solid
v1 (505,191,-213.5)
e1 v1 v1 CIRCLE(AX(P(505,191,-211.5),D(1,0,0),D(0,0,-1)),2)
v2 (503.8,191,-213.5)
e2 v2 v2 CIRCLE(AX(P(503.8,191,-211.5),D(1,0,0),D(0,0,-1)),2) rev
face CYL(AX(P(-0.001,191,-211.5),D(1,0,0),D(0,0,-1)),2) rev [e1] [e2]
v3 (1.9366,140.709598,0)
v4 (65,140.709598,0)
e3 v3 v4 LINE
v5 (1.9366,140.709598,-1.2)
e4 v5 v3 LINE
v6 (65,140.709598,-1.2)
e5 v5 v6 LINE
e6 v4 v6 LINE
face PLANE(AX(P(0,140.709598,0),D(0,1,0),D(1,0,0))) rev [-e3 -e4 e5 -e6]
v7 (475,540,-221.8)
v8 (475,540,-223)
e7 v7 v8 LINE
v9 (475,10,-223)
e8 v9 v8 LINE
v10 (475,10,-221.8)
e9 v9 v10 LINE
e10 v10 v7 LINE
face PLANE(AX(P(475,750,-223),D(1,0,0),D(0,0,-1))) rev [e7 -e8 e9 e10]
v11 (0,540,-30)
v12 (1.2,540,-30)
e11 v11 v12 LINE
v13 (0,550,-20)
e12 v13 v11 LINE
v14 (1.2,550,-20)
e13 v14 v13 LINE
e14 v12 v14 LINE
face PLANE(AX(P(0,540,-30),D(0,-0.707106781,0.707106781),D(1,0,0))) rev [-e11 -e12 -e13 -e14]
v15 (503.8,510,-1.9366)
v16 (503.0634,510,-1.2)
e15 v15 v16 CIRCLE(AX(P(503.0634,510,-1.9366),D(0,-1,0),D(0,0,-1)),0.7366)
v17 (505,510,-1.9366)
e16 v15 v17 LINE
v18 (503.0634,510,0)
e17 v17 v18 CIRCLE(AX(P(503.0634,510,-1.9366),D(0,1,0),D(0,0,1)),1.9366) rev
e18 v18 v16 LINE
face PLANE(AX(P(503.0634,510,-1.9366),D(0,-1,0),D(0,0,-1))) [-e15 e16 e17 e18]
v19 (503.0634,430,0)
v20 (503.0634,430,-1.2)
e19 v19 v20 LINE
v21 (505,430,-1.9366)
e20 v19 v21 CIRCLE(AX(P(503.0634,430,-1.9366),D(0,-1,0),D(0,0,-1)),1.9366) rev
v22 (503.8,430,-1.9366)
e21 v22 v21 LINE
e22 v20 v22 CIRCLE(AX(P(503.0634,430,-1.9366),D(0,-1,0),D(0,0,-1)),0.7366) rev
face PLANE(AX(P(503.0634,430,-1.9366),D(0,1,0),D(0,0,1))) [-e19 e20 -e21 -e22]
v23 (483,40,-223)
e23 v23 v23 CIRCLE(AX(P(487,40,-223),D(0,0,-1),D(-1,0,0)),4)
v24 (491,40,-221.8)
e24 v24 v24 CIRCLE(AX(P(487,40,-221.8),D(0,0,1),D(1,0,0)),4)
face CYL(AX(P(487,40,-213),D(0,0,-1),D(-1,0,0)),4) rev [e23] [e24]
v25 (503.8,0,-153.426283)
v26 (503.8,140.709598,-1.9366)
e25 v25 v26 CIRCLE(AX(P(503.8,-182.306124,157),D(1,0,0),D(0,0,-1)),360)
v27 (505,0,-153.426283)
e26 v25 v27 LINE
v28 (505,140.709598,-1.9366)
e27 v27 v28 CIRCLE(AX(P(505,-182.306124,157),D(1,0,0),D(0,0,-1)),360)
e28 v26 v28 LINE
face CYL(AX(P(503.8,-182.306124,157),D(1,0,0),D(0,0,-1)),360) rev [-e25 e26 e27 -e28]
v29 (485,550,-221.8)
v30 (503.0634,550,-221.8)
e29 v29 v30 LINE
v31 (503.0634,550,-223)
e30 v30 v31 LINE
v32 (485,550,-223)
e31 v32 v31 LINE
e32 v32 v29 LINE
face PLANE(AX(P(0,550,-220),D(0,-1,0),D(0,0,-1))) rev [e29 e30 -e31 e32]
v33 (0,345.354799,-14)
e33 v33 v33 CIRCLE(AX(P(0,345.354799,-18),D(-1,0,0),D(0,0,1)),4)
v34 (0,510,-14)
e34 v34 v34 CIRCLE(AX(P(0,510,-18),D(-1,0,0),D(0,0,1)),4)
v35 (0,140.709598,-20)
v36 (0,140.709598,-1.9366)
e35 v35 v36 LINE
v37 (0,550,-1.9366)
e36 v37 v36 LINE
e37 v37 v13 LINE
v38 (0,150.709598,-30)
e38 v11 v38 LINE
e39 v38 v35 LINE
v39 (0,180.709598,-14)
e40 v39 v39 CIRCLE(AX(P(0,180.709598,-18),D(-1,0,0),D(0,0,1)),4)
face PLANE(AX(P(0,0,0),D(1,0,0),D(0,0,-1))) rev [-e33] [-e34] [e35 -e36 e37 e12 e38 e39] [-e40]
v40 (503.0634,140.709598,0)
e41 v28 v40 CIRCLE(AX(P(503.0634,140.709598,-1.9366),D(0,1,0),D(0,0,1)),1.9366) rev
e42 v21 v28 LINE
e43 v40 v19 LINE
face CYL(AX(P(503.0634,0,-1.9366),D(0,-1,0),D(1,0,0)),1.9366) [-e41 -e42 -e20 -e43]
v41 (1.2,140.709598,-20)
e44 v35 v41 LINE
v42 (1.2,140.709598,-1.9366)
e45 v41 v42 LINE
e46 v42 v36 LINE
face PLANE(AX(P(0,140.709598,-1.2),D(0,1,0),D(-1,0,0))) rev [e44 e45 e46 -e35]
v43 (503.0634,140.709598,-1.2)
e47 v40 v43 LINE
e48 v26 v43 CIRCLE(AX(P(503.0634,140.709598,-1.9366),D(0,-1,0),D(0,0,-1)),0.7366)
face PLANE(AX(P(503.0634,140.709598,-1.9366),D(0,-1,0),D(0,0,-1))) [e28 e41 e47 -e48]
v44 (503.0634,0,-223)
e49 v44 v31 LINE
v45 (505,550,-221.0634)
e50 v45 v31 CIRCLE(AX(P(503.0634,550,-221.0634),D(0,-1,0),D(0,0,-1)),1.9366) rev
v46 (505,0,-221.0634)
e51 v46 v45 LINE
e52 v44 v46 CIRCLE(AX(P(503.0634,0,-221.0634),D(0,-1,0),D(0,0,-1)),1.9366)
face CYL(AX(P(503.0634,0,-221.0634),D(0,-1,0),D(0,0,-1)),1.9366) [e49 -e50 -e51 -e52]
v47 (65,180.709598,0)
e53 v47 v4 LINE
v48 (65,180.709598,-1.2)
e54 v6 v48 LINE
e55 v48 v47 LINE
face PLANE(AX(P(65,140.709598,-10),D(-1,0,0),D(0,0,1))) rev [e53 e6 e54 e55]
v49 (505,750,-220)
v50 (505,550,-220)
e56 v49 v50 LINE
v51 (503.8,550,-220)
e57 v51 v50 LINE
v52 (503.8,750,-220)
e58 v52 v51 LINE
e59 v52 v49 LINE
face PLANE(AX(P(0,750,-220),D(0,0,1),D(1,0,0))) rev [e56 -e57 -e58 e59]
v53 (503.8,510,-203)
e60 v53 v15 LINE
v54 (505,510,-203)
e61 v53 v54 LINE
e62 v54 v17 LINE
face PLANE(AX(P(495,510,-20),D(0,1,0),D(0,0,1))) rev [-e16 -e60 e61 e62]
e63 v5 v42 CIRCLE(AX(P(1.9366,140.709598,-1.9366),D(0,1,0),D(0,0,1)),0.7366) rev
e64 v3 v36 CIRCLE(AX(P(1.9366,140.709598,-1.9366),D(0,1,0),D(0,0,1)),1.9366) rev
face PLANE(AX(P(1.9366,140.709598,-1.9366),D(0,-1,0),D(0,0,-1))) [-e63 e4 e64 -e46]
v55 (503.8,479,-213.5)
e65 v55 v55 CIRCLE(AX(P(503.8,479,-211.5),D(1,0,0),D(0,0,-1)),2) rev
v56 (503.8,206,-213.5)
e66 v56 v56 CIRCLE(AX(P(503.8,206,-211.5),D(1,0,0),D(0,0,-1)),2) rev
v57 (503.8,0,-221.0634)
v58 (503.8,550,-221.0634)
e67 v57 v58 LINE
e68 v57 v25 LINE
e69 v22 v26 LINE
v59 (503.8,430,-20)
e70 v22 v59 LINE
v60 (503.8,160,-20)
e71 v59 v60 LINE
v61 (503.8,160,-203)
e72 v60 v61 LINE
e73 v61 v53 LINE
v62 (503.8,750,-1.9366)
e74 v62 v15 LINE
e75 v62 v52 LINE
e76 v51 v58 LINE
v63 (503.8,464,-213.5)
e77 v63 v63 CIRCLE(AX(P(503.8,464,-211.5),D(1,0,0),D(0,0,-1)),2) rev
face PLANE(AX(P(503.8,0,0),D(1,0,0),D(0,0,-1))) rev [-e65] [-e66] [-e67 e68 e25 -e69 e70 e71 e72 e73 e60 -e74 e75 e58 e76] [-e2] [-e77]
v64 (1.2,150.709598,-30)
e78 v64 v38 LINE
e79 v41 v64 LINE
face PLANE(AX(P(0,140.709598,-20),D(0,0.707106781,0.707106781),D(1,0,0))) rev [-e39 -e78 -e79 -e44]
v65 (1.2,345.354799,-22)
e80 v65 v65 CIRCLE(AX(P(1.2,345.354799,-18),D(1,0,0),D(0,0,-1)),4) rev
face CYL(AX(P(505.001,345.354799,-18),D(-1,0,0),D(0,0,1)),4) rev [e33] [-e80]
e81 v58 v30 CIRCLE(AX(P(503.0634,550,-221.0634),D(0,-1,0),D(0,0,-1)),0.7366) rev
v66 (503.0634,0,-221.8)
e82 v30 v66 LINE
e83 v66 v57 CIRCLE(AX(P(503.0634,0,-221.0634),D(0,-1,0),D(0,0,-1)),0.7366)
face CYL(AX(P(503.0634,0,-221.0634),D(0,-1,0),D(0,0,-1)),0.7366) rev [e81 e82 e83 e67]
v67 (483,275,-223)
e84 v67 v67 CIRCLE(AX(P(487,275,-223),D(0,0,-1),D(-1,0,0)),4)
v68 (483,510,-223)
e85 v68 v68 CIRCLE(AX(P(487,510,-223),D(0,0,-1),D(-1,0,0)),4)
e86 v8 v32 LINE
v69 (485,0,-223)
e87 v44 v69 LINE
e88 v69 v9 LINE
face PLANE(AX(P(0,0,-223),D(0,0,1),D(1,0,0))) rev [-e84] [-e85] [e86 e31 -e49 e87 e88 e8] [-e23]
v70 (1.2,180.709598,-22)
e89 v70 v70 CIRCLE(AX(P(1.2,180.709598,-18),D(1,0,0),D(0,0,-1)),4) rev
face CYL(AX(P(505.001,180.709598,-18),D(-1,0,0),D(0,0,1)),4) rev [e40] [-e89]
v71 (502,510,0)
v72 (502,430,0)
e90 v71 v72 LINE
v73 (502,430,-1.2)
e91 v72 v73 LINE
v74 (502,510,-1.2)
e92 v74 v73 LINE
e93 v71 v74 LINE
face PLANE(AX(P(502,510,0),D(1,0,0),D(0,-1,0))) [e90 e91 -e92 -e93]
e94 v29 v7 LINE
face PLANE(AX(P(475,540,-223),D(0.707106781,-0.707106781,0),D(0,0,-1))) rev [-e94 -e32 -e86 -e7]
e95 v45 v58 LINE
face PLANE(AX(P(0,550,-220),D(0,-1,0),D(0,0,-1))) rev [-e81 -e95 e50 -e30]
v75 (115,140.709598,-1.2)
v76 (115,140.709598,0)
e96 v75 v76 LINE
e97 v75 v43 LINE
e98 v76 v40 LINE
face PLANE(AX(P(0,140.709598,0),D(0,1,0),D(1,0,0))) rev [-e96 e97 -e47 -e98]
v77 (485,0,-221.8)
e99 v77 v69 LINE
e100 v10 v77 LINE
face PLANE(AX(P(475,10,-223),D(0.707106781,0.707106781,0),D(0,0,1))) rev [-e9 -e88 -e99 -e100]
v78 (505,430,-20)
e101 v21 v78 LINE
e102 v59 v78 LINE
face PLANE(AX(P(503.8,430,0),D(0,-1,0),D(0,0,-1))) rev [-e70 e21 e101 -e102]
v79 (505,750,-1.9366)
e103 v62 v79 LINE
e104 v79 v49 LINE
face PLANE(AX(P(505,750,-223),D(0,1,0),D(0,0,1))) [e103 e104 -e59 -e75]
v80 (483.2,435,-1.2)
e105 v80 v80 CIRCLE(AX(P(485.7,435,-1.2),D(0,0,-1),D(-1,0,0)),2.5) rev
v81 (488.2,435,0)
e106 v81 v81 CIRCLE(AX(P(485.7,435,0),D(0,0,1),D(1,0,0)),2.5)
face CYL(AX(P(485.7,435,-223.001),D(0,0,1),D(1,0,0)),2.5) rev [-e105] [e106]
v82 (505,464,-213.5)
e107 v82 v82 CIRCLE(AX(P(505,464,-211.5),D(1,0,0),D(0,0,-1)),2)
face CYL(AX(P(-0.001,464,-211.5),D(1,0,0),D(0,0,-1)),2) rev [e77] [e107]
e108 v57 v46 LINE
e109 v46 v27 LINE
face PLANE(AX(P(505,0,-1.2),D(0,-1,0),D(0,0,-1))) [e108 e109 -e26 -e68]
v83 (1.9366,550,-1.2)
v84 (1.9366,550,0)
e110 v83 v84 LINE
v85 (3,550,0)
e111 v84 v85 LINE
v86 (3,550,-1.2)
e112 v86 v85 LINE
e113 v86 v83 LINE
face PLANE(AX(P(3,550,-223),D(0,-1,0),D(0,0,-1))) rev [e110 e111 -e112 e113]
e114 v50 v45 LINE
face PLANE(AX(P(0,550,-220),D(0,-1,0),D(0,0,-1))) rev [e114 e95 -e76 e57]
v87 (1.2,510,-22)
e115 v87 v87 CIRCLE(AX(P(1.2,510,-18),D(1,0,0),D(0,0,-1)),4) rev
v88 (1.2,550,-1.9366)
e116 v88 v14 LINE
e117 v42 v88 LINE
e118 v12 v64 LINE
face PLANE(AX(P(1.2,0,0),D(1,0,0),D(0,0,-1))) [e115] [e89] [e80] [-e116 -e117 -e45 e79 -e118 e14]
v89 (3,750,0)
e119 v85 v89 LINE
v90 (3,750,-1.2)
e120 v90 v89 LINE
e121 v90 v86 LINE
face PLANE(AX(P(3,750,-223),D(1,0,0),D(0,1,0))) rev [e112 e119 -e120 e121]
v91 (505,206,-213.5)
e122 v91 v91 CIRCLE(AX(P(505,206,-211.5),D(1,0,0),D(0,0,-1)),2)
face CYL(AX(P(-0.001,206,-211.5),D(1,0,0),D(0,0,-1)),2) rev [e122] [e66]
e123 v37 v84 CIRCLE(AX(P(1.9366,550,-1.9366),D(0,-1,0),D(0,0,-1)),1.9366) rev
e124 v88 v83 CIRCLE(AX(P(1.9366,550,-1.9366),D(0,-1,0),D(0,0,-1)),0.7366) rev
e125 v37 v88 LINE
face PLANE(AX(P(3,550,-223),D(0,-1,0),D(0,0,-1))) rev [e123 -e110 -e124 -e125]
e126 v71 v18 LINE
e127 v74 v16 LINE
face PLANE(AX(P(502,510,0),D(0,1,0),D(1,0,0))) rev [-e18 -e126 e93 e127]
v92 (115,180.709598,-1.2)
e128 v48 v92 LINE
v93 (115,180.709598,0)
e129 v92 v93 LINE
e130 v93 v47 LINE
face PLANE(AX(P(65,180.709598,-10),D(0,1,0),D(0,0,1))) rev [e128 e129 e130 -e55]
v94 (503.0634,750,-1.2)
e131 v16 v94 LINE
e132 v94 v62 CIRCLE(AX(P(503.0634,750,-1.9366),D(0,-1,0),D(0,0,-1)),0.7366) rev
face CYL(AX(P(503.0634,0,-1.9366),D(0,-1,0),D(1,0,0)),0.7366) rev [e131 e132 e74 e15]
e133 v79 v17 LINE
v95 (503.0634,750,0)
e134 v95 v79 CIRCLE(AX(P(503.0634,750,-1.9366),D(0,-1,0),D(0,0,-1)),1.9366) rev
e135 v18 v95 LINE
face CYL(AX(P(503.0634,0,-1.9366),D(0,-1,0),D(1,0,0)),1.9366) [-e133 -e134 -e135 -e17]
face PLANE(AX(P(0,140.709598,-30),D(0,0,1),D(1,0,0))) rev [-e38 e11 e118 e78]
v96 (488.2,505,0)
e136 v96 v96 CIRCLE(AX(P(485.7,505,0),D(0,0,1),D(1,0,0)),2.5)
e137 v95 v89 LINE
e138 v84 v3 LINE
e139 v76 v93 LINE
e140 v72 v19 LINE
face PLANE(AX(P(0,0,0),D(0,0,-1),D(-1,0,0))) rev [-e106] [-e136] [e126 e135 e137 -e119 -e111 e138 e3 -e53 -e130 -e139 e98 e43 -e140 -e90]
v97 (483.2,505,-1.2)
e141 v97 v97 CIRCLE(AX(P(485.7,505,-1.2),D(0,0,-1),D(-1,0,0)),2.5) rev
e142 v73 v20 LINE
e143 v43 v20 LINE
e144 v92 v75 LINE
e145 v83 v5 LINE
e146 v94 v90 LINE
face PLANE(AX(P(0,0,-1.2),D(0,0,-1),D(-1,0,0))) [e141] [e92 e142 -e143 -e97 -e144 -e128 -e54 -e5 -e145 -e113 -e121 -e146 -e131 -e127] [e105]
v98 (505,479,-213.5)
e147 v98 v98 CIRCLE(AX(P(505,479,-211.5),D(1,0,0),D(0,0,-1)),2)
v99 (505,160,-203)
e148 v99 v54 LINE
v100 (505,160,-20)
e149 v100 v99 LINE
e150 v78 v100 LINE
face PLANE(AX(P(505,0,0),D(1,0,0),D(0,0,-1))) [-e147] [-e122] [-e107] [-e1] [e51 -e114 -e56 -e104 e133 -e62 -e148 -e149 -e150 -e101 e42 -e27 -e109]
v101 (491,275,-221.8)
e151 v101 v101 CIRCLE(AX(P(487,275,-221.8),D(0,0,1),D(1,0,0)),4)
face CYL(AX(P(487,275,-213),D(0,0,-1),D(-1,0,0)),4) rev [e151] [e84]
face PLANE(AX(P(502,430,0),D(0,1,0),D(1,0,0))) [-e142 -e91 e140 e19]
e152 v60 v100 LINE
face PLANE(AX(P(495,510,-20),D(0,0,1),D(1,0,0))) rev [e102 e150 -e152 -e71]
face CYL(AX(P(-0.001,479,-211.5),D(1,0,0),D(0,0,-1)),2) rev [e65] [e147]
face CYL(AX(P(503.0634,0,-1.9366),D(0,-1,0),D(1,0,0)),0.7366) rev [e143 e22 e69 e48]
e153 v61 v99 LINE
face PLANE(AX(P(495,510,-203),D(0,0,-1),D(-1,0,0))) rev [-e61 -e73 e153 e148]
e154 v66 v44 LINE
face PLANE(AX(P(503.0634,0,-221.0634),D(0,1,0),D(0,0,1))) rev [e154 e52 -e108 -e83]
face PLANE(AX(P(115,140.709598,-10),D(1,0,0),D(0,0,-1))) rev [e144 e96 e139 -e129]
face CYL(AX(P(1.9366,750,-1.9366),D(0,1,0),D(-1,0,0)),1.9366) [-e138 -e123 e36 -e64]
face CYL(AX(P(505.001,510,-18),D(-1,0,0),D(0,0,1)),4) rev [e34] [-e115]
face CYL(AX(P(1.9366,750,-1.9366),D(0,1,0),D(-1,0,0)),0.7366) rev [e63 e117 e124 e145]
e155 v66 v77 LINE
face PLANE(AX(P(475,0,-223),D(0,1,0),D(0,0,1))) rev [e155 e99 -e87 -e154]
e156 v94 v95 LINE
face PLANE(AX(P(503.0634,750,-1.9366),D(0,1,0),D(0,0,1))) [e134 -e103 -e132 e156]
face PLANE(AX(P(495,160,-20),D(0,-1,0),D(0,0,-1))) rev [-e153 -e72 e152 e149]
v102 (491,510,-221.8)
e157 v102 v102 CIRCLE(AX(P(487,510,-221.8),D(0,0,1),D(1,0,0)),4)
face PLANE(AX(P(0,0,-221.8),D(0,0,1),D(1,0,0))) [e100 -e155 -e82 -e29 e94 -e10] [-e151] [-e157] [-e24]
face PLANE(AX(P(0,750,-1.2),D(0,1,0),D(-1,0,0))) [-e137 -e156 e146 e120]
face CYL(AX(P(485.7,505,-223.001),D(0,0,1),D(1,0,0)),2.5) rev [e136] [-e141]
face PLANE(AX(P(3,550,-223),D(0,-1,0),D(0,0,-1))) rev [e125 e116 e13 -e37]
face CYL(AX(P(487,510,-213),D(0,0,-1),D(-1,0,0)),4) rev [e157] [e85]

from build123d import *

# Parameters (mm, degrees)
SKETCH_1_W                       = 505
SKETCH_1_H                       = 750
SM_BASE_FLANGE_1_DEPTH           = 1.2
SM_EDGE_FLANGE_1_STRIP_W         = 6.2732
SM_EDGE_FLANGE_1_STRIP_H         = 1.2
SM_EDGE_FLANGE_1_STRIP_CUT_DEPTH = 750
SM_EDGE_FLANGE_1_DEPTH           = 750
CUT_EXTRUDE_1_DEPTH              = 932.264731427
SM_EDGE_FLANGE_2_STRIP_W         = 6.2732
SM_EDGE_FLANGE_2_STRIP_H         = 1.2
SM_EDGE_FLANGE_2_STRIP_CUT_DEPTH = 750
SM_EDGE_FLANGE_2_DEPTH           = 750
SM_EDGE_FLANGE_3_STRIP_W         = 6.2732
SM_EDGE_FLANGE_3_STRIP_H         = 1.2
SM_EDGE_FLANGE_3_STRIP_CUT_DEPTH = 609.290401588
SM_EDGE_FLANGE_3_DEPTH           = 609.290401588
SKETCH_16_W                      = 41.475289024
SKETCH_16_H                      = 200
CUT_EXTRUDE_2_DEPTH              = 932.264731427
SKETCH_17_W                      = 35.547342431
SKETCH_17_H                      = 200
CUT_EXTRUDE_3_DEPTH              = 932.264731427
CHAMFER_1_SIZE                   = 10
SKETCH_19_W                      = 183
SKETCH_19_H                      = 350
CUT_EXTRUDE_4_DEPTH              = 10
SKETCH_20_W                      = 20
SKETCH_20_H                      = 80
CUT_EXTRUDE_5_DEPTH              = 3
CUT_EXTRUDE_6_REACH              = 933.265
SKETCH_21_R                      = 2.5
CUT_EXTRUDE_7_REACH              = 933.265
SKETCH_22_R                      = 2
SKETCH_23_R                      = 4
CUT_EXTRUDE_8_DEPTH              = 10
CUT_EXTRUDE_9_REACH              = 933.265
SKETCH_24_R                      = 4
SKETCH_25_W                      = 50
SKETCH_25_H                      = 40
CUT_EXTRUDE_10_DEPTH             = 10


# Sheet-metal steps are written as plain solids
with BuildPart() as part:
    # Sketch 1 → Базовая кромка1 (new body)
    with BuildSketch(Plane.XY):
        with Locations((252.5, 375)):
            Rectangle(SKETCH_1_W, SKETCH_1_H)
    extrude(amount=-SM_BASE_FLANGE_1_DEPTH)

    # Ребро-кромка1 strip (across the edge) → Ребро-кромка1 strip cut (cut)
    with BuildSketch(Plane(origin=(505, 750, -1.2), x_dir=(-1, 0, 0), z_dir=(0, -1, 0))):
        with Locations((-1.2, -0.6)):
            Rectangle(SM_EDGE_FLANGE_1_STRIP_W, SM_EDGE_FLANGE_1_STRIP_H)
    extrude(amount=SM_EDGE_FLANGE_1_STRIP_CUT_DEPTH, mode=Mode.SUBTRACT)

    # Ребро-кромка1 section (across the edge) → Ребро-кромка1 (add)
    with BuildSketch(Plane(origin=(505, 750, -1.2), x_dir=(-1, 0, 0), z_dir=(0, -1, 0))):
        with BuildLine():
            Line((0, 0.7366), (0, 221.8))
            Line((0, 221.8), (1.2, 221.8))
            Line((1.2, 221.8), (1.2, 0.7366))
            ThreePointArc((1.2, 0.7366), (1.415745145, 0.215745145), (1.9366, 0))
            Line((1.9366, 0), (1.9366, -1.2))
            ThreePointArc((1.9366, -1.2), (0.567217008, -0.632782992), (0, 0.7366))
        make_face()
    extrude(amount=SM_EDGE_FLANGE_1_DEPTH)

    # Эскиз9 → Вырез-Вытянуть1 (cut, through all)
    with BuildSketch(Plane(origin=(505, 0, 0), x_dir=(0, 0, -1), z_dir=(1, 0, 0))):
        with BuildLine():
            Line((1.9366, 140.709598412), (-18.72453306, 140.709598412))
            Line((-18.72453306, 140.709598412), (-18.72453306, 150.079036589))
            ThreePointArc((-18.72453306, 150.079036589), (-305.67985666, -510.169358417), (1.9366, 140.709598412))
        make_face()
    extrude(amount=-CUT_EXTRUDE_1_DEPTH, mode=Mode.SUBTRACT)

    # Ребро-кромка2 strip (across the edge) → Ребро-кромка2 strip cut (cut)
    with BuildSketch(Plane(origin=(503.8, 750, -223), x_dir=(0, 0, 1), z_dir=(0, -1, 0))):
        with Locations((-1.2, -0.6)):
            Rectangle(SM_EDGE_FLANGE_2_STRIP_W, SM_EDGE_FLANGE_2_STRIP_H)
    extrude(amount=SM_EDGE_FLANGE_2_STRIP_CUT_DEPTH, mode=Mode.SUBTRACT)

    # Ребро-кромка2 section (across the edge) → Ребро-кромка2 (add)
    with BuildSketch(Plane(origin=(503.8, 750, -223), x_dir=(0, 0, 1), z_dir=(0, -1, 0))):
        with BuildLine():
            Line((0, 0.7366), (0, 28.8))
            Line((0, 28.8), (1.2, 28.8))
            Line((1.2, 28.8), (1.2, 0.7366))
            ThreePointArc((1.2, 0.7366), (1.415745145, 0.215745145), (1.9366, 0))
            Line((1.9366, 0), (1.9366, -1.2))
            ThreePointArc((1.9366, -1.2), (0.567217008, -0.632782992), (0, 0.7366))
        make_face()
    extrude(amount=SM_EDGE_FLANGE_2_DEPTH)

    # Ребро-кромка3 strip (across the edge) → Ребро-кромка3 strip cut (cut)
    with BuildSketch(Plane(origin=(0, 140.709598412, -1.2), x_dir=(1, 0, 0), z_dir=(0, 1, 0))):
        with Locations((-1.2, -0.6)):
            Rectangle(SM_EDGE_FLANGE_3_STRIP_W, SM_EDGE_FLANGE_3_STRIP_H)
    extrude(amount=SM_EDGE_FLANGE_3_STRIP_CUT_DEPTH, mode=Mode.SUBTRACT)

    # Ребро-кромка3 section (across the edge) → Ребро-кромка3 (add)
    with BuildSketch(Plane(origin=(0, 140.709598412, -1.2), x_dir=(1, 0, 0), z_dir=(0, 1, 0))):
        with BuildLine():
            Line((0, 0.7366), (0, 28.8))
            Line((0, 28.8), (1.2, 28.8))
            Line((1.2, 28.8), (1.2, 0.7366))
            ThreePointArc((1.2, 0.7366), (1.415745145, 0.215745145), (1.9366, 0))
            Line((1.9366, 0), (1.9366, -1.2))
            ThreePointArc((1.9366, -1.2), (0.567217008, -0.632782992), (0, 0.7366))
        make_face()
    extrude(amount=SM_EDGE_FLANGE_3_DEPTH)

    # Эскиз16 → Вырез-Вытянуть2 (cut, through all)
    with BuildSketch(Plane(origin=(505, 0, 0), x_dir=(0, 0, -1), z_dir=(1, 0, 0))):
        with Locations((240.737644512, 650)):
            Rectangle(SKETCH_16_W, SKETCH_16_H)
    extrude(amount=-CUT_EXTRUDE_2_DEPTH, mode=Mode.SUBTRACT)

    # Эскиз17 → Вырез-Вытянуть3 (cut, through all)
    with BuildSketch(Plane.XY):
        with Locations((-14.773671216, 650)):
            Rectangle(SKETCH_17_W, SKETCH_17_H)
    extrude(amount=-CUT_EXTRUDE_3_DEPTH, mode=Mode.SUBTRACT)

    # Фаска1
    chamfer_1_edges = [part.edges().sort_by_distance(p)[0] for p in [
        (0.6, 140.709598412, -30),
        (475, 550, -222.4),
        (0.6, 550, -30),
        (475, 0, -222.4),
    ]]
    chamfer(chamfer_1_edges, length=CHAMFER_1_SIZE)

    # Эскиз19 → Вырез-Вытянуть4 (cut)
    with BuildSketch(Plane(origin=(505, 0, 0), x_dir=(0, 0, -1), z_dir=(1, 0, 0))):
        with Locations((111.5, 335)):
            Rectangle(SKETCH_19_W, SKETCH_19_H)
    extrude(amount=-CUT_EXTRUDE_4_DEPTH, mode=Mode.SUBTRACT)

    # Эскиз20 → Вырез-Вытянуть5 (cut)
    with BuildSketch(Plane(origin=(505, 0, 0), x_dir=(0, 0, -1), z_dir=(1, 0, 0))):
        with Locations((10, 470)):
            Rectangle(SKETCH_20_W, SKETCH_20_H)
    extrude(amount=-CUT_EXTRUDE_5_DEPTH, mode=Mode.SUBTRACT)

    # Эскиз21 → Вырез-Вытянуть6 (cut, up to next)
    with BuildSketch(Plane.XY, mode=Mode.PRIVATE) as cut_extrude_6_sk1:
        with Locations((485.7, 505)):
            Circle(SKETCH_21_R)
    cut_extrude_6_tool1 = extrude(cut_extrude_6_sk1.sketch, amount=-CUT_EXTRUDE_6_REACH, mode=Mode.PRIVATE) & part.part
    # Эскиз21 → Вырез-Вытянуть6 (cut, up to next)
    with BuildSketch(Plane.XY, mode=Mode.PRIVATE) as cut_extrude_6_sk2:
        with Locations((485.7, 435)):
            Circle(SKETCH_21_R)
    cut_extrude_6_tool2 = extrude(cut_extrude_6_sk2.sketch, amount=-CUT_EXTRUDE_6_REACH, mode=Mode.PRIVATE) & part.part
    add(cut_extrude_6_tool1.solids().sort_by_distance((485.7, 505, 0))[0], mode=Mode.SUBTRACT)
    add(cut_extrude_6_tool2.solids().sort_by_distance((485.7, 435, 0))[0], mode=Mode.SUBTRACT)

    # Эскиз22 → Вырез-Вытянуть7 (cut, up to next)
    with BuildSketch(Plane(origin=(505, 0, 0), x_dir=(0, 0, -1), z_dir=(1, 0, 0)), mode=Mode.PRIVATE) as cut_extrude_7_sk1:
        with Locations((211.5, 479)):
            Circle(SKETCH_22_R)
    cut_extrude_7_tool1 = extrude(cut_extrude_7_sk1.sketch, amount=-CUT_EXTRUDE_7_REACH, mode=Mode.PRIVATE) & part.part
    # Эскиз22 → Вырез-Вытянуть7 (cut, up to next)
    with BuildSketch(Plane(origin=(505, 0, 0), x_dir=(0, 0, -1), z_dir=(1, 0, 0)), mode=Mode.PRIVATE) as cut_extrude_7_sk2:
        with Locations((211.5, 464)):
            Circle(SKETCH_22_R)
    cut_extrude_7_tool2 = extrude(cut_extrude_7_sk2.sketch, amount=-CUT_EXTRUDE_7_REACH, mode=Mode.PRIVATE) & part.part
    # Эскиз22 → Вырез-Вытянуть7 (cut, up to next)
    with BuildSketch(Plane(origin=(505, 0, 0), x_dir=(0, 0, -1), z_dir=(1, 0, 0)), mode=Mode.PRIVATE) as cut_extrude_7_sk3:
        with Locations((211.5, 206)):
            Circle(SKETCH_22_R)
    cut_extrude_7_tool3 = extrude(cut_extrude_7_sk3.sketch, amount=-CUT_EXTRUDE_7_REACH, mode=Mode.PRIVATE) & part.part
    # Эскиз22 → Вырез-Вытянуть7 (cut, up to next)
    with BuildSketch(Plane(origin=(505, 0, 0), x_dir=(0, 0, -1), z_dir=(1, 0, 0)), mode=Mode.PRIVATE) as cut_extrude_7_sk4:
        with Locations((211.5, 191)):
            Circle(SKETCH_22_R)
    cut_extrude_7_tool4 = extrude(cut_extrude_7_sk4.sketch, amount=-CUT_EXTRUDE_7_REACH, mode=Mode.PRIVATE) & part.part
    add(cut_extrude_7_tool1.solids().sort_by_distance((505, 479, -211.5))[0], mode=Mode.SUBTRACT)
    add(cut_extrude_7_tool2.solids().sort_by_distance((505, 464, -211.5))[0], mode=Mode.SUBTRACT)
    add(cut_extrude_7_tool3.solids().sort_by_distance((505, 206, -211.5))[0], mode=Mode.SUBTRACT)
    add(cut_extrude_7_tool4.solids().sort_by_distance((505, 191, -211.5))[0], mode=Mode.SUBTRACT)

    # Эскиз23 → Вырез-Вытянуть8 (cut)
    with BuildSketch(Plane(origin=(0, 0, -223), x_dir=(-1, 0, 0), z_dir=(0, 0, -1))):
        with Locations((-487, 510)):
            Circle(SKETCH_23_R)
        with Locations((-487, 275)):
            Circle(SKETCH_23_R)
        with Locations((-487, 40)):
            Circle(SKETCH_23_R)
    extrude(amount=-CUT_EXTRUDE_8_DEPTH, mode=Mode.SUBTRACT)

    # Эскиз24 → Вырез-Вытянуть9 (cut, up to next)
    with BuildSketch(Plane.ZY, mode=Mode.PRIVATE) as cut_extrude_9_sk1:
        with Locations((-18, 510)):
            Circle(SKETCH_24_R)
    cut_extrude_9_tool1 = extrude(cut_extrude_9_sk1.sketch, amount=-CUT_EXTRUDE_9_REACH, mode=Mode.PRIVATE) & part.part
    # Эскиз24 → Вырез-Вытянуть9 (cut, up to next)
    with BuildSketch(Plane.ZY, mode=Mode.PRIVATE) as cut_extrude_9_sk2:
        with Locations((-18, 345.354799206)):
            Circle(SKETCH_24_R)
    cut_extrude_9_tool2 = extrude(cut_extrude_9_sk2.sketch, amount=-CUT_EXTRUDE_9_REACH, mode=Mode.PRIVATE) & part.part
    # Эскиз24 → Вырез-Вытянуть9 (cut, up to next)
    with BuildSketch(Plane.ZY, mode=Mode.PRIVATE) as cut_extrude_9_sk3:
        with Locations((-18, 180.709598412)):
            Circle(SKETCH_24_R)
    cut_extrude_9_tool3 = extrude(cut_extrude_9_sk3.sketch, amount=-CUT_EXTRUDE_9_REACH, mode=Mode.PRIVATE) & part.part
    add(cut_extrude_9_tool1.solids().sort_by_distance((0, 510, -18))[0], mode=Mode.SUBTRACT)
    add(cut_extrude_9_tool2.solids().sort_by_distance((0, 345.354799, -18))[0], mode=Mode.SUBTRACT)
    add(cut_extrude_9_tool3.solids().sort_by_distance((0, 180.709598, -18))[0], mode=Mode.SUBTRACT)

    # Эскиз25 → Вырез-Вытянуть10 (cut)
    with BuildSketch(Plane.XY):
        with Locations((90, 160.709598412)):
            Rectangle(SKETCH_25_W, SKETCH_25_H)
    extrude(amount=-CUT_EXTRUDE_10_DEPTH, mode=Mode.SUBTRACT)


solid = part.part
